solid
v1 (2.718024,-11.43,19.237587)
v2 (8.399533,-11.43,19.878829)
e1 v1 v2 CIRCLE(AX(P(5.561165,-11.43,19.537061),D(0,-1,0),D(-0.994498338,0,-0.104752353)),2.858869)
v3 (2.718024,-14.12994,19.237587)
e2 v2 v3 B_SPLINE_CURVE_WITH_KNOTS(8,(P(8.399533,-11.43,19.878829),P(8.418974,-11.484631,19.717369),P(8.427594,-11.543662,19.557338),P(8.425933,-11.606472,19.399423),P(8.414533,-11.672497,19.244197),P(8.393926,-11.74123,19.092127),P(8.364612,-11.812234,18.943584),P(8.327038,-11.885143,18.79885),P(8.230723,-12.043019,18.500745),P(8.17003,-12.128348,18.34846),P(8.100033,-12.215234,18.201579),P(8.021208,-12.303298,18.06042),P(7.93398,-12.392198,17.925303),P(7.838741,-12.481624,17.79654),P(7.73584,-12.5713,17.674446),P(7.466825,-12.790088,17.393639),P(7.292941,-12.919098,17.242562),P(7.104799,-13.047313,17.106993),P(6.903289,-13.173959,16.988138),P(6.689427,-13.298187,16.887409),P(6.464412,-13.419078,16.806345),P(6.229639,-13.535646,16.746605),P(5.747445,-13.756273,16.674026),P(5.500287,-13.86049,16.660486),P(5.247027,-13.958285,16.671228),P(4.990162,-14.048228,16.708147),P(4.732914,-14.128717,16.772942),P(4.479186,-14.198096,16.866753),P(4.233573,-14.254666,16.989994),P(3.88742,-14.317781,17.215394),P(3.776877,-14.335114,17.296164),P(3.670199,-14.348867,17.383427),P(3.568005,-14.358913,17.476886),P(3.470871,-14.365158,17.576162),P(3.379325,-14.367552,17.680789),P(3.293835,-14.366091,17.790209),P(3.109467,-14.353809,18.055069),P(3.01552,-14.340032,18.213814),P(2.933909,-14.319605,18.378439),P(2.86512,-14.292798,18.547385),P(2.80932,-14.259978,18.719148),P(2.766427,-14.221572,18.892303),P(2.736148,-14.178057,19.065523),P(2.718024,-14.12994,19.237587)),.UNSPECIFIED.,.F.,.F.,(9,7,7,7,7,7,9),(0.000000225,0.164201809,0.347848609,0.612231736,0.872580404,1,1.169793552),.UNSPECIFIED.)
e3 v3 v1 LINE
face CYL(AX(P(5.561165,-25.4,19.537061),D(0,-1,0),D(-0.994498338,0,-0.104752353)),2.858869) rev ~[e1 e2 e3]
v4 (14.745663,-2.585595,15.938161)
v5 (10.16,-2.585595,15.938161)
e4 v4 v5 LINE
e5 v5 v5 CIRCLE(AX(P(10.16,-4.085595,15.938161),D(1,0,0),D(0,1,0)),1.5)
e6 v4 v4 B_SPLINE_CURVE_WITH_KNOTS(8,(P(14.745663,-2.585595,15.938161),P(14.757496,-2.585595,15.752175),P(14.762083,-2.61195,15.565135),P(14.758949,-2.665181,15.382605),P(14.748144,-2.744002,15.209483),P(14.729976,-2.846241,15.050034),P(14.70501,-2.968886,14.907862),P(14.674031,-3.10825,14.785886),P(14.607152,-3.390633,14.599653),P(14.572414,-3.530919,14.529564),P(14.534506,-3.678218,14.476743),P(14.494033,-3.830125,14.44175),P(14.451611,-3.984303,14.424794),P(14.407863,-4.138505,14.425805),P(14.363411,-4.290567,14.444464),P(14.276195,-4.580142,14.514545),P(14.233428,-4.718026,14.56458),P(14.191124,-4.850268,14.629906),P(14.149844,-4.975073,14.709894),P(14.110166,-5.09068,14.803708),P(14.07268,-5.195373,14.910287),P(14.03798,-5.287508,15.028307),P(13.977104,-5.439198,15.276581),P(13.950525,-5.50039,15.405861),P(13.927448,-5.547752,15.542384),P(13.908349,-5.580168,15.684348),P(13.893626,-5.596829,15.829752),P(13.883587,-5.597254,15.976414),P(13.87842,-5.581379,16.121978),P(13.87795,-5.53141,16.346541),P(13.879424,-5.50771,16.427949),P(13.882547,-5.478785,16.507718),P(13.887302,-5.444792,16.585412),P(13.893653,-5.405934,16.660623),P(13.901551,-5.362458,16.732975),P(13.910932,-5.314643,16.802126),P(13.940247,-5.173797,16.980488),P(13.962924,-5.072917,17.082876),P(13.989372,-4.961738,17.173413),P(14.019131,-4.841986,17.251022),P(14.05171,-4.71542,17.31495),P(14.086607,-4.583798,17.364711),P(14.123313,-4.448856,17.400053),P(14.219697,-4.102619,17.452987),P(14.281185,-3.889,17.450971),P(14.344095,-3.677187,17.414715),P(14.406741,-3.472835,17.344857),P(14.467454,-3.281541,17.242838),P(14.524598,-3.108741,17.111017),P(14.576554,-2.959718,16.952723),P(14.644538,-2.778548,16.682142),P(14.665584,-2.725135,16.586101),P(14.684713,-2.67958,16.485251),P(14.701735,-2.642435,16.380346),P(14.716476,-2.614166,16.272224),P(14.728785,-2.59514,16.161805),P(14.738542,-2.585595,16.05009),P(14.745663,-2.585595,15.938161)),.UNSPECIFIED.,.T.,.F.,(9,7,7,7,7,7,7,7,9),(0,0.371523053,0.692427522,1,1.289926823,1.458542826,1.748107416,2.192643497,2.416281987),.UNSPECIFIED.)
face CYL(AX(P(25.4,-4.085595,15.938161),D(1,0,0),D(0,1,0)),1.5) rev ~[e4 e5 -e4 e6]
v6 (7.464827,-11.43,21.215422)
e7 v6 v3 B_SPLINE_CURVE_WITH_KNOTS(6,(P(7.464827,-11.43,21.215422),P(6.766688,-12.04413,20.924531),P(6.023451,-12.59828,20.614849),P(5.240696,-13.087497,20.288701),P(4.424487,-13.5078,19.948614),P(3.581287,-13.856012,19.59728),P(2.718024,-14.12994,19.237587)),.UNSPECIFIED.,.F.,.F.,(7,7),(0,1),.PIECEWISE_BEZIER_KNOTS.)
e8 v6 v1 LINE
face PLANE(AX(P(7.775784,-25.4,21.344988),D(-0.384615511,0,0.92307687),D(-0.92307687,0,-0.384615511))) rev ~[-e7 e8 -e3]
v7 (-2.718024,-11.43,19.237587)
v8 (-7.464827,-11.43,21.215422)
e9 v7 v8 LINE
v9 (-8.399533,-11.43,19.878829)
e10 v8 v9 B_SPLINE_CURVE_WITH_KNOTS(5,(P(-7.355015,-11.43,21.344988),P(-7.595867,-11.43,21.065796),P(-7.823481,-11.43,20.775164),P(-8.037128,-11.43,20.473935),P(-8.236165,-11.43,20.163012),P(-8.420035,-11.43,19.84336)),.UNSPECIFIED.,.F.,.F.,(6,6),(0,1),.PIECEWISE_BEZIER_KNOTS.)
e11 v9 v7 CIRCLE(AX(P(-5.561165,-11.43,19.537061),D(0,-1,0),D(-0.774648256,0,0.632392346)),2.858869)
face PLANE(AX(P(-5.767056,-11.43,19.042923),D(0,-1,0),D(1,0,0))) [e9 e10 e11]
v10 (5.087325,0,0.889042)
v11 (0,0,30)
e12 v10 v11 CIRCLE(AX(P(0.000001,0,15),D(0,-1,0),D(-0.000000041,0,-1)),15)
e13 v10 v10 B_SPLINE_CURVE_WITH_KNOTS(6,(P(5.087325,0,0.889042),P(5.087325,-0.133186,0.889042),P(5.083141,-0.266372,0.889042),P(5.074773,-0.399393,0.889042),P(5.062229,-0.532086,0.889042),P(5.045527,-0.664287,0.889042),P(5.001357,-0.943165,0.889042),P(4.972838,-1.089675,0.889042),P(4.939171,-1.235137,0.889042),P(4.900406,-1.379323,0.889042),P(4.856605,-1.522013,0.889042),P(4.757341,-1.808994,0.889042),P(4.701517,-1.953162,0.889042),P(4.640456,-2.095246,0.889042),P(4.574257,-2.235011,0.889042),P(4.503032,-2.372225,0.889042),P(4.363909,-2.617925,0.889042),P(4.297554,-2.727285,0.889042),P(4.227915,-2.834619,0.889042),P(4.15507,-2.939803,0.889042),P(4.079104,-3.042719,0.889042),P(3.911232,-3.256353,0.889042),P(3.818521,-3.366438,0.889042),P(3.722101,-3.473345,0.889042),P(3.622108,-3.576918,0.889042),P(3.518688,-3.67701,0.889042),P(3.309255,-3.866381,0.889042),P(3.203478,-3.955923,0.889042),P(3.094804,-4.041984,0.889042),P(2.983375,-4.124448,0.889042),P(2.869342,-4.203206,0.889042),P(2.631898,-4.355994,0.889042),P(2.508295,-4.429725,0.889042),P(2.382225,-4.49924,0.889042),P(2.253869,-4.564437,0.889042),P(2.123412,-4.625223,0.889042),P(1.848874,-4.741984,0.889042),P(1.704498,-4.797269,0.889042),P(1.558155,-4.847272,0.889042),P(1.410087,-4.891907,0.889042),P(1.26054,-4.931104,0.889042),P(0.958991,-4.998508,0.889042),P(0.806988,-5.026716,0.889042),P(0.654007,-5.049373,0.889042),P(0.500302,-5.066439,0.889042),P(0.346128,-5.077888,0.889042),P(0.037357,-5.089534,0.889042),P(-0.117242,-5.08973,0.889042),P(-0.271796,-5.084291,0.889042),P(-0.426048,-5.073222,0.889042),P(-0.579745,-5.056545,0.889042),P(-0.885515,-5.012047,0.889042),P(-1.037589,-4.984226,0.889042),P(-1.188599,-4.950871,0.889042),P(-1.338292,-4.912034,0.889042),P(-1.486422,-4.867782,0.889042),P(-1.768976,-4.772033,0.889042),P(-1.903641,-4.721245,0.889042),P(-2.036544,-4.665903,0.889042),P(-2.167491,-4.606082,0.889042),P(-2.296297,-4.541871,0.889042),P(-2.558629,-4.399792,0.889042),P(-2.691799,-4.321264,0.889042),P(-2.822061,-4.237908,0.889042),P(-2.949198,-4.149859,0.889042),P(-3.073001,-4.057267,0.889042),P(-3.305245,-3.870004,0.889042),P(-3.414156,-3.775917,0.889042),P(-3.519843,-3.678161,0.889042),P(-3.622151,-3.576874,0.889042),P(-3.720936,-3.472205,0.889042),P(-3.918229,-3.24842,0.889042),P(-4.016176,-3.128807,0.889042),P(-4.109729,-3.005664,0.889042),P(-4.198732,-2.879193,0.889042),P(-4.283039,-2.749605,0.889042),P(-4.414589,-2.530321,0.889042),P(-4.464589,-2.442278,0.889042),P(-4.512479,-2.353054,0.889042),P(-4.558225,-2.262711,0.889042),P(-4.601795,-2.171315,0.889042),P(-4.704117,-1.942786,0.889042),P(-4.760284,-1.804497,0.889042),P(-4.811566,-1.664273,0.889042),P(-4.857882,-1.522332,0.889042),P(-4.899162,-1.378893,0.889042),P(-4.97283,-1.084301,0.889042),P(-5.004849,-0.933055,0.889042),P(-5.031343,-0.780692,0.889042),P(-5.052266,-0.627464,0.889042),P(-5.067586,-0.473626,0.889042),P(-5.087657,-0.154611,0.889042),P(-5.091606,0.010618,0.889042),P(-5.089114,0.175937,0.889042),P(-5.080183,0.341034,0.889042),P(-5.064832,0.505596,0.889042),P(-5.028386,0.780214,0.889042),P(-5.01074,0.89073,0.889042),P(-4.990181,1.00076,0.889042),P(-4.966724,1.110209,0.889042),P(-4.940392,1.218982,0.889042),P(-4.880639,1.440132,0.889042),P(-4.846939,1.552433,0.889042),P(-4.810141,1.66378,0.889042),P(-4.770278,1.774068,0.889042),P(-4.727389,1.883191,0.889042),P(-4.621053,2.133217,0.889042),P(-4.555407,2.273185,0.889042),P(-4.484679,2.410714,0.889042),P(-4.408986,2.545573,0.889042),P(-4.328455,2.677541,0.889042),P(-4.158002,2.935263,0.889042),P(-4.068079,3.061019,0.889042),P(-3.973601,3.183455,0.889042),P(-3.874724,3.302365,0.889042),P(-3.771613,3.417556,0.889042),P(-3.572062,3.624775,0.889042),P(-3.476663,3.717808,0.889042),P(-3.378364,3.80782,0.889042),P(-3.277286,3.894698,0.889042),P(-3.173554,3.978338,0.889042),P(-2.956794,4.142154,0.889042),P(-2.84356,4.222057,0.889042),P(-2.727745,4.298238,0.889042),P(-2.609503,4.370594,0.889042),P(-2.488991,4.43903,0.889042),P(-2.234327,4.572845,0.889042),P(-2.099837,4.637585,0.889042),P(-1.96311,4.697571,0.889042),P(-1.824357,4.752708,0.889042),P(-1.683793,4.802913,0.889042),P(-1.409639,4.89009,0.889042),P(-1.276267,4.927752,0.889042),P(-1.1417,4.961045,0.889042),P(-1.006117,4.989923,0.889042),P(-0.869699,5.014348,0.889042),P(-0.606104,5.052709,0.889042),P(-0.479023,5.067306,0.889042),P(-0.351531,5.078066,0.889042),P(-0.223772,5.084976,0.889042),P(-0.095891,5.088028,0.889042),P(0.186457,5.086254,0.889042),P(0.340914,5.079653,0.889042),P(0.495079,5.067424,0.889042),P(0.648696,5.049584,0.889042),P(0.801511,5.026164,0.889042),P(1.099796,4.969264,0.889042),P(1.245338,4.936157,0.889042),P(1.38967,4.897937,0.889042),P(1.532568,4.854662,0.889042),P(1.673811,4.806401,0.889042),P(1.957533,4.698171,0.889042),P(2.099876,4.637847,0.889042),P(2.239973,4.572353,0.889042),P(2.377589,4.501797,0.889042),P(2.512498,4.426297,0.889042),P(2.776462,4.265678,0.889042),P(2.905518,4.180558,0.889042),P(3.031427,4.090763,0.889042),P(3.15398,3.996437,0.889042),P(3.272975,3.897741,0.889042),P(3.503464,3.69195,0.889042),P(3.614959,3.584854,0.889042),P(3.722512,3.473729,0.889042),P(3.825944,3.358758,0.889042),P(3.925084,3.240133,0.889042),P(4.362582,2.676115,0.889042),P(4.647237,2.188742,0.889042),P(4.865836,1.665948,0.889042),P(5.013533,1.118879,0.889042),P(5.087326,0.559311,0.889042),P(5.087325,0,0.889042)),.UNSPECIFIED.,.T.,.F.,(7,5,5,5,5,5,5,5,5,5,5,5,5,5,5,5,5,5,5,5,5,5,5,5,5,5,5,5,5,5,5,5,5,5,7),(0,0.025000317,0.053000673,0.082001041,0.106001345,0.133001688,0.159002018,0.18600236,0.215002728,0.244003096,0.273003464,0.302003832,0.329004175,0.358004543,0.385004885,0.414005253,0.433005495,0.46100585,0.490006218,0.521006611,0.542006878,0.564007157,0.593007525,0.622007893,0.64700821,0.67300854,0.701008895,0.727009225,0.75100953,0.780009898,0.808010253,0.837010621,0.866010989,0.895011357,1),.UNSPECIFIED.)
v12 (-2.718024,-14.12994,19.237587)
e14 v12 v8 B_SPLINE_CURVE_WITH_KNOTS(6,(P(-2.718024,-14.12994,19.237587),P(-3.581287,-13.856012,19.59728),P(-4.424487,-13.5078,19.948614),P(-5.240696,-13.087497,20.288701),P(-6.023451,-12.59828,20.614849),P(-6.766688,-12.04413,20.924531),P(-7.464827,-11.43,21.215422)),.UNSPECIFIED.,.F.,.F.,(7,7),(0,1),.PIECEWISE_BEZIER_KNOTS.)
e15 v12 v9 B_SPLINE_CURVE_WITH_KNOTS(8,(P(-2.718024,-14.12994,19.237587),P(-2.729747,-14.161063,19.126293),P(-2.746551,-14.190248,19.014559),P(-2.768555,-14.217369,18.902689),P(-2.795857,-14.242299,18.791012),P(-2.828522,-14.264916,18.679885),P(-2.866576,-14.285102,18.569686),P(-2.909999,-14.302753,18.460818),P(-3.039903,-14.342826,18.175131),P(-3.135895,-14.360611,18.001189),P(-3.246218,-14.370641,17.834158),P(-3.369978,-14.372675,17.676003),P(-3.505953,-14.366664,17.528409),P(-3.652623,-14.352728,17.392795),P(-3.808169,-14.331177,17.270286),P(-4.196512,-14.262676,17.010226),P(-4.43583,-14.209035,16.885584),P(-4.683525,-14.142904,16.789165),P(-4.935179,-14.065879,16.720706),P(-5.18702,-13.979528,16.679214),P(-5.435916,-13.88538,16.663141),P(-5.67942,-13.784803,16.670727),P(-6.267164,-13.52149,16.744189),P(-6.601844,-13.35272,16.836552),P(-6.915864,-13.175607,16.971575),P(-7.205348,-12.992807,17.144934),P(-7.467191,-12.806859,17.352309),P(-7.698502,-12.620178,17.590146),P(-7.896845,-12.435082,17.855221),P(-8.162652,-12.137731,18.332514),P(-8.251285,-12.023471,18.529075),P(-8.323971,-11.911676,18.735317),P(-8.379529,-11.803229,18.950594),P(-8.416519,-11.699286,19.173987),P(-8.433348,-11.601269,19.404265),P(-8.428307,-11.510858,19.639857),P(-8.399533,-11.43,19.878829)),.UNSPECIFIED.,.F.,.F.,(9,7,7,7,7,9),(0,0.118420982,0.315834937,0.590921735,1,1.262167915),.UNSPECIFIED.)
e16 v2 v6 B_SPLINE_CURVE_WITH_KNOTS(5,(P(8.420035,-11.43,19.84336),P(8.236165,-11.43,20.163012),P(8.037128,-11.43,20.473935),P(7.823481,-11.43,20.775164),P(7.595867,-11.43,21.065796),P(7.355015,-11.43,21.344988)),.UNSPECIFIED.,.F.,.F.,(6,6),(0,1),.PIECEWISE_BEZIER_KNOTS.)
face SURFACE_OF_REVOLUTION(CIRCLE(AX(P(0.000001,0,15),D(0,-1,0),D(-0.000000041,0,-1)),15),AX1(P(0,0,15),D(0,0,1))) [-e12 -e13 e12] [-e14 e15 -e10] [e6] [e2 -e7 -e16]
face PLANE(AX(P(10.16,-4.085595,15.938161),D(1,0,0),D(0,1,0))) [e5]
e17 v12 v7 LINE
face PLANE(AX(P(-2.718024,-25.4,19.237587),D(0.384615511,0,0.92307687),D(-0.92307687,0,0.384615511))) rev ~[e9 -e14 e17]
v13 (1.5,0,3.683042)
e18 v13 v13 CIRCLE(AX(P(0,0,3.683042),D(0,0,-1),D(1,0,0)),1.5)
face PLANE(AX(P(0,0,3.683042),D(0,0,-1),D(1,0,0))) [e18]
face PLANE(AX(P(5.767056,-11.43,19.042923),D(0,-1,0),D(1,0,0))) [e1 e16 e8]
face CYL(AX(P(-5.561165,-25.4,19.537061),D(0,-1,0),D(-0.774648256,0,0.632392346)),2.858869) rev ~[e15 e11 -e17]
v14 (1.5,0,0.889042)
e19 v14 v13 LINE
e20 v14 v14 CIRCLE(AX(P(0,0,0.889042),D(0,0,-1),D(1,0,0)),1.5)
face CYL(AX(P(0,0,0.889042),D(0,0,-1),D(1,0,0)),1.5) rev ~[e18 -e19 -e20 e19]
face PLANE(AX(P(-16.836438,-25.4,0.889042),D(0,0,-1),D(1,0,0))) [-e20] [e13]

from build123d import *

# Parameters (mm, degrees)
F5_DEPTH  = 13.97
F6_R      = 1.5
F7_DEPTH  = 15.24
F8_W      = 36.1250601709
F8_H      = 9.7824148252
F9_DEPTH  = 76.2
F10_R     = 1.5
F11_DEPTH = 2.794


# Not quite as in the source:
# - ends of sketch curves that miss each other by under 0.0002 mm in the source are joined


with BuildPart() as f1:
    # F0 (on Front) → F1 (revolve)
    with BuildSketch(Plane.XZ):
        with BuildLine():
            Line((0, 30), (0, 0))
            ThreePointArc((0, 0), (15.0000006192, 15), (0, 30))
        make_face()
    revolve(axis=Axis((0, 0, 15), (0, 0, 1)))

    # F4 (on offset) → F5 (cut)
    with BuildSketch(Plane.XZ.offset(25.4)):
        with BuildLine():
            ThreePointArc((-7.7757835388, 21.3449876755), (-6.6607308484, 16.8981042804), (-2.7180244215, 19.2375872284))
            Line((-2.7180244215, 19.2375872284), (-7.7757835388, 21.3449876755))
        make_face()
        with BuildLine():
            Line((7.7757835388, 21.3449876755), (2.7180244215, 19.2375872284))
            ThreePointArc((2.7180244215, 19.2375872284), (6.6607308484, 16.8981042804), (7.7757835388, 21.3449876755))
        make_face()
    extrude(amount=-F5_DEPTH, mode=Mode.SUBTRACT)

    # F6 (on offset) → F7 (cut)
    with BuildSketch(Plane.YZ.offset(25.4)):
        with Locations((-4.0855947882, 15.938160941)):
            Circle(F6_R)
    extrude(amount=-F7_DEPTH, mode=Mode.SUBTRACT)

    # F8 (on offset) → F9 (cut)
    with BuildSketch(Plane.XZ.offset(25.4)):
        with Locations((1.2260917574, -4.0021650784)):
            Rectangle(F8_W, F8_H)
    extrude(amount=-F9_DEPTH, mode=Mode.SUBTRACT)

    # F10 (on face) → F11 (cut)
    with BuildSketch(Plane(origin=(0, 0, 0.8890423342), x_dir=(1, 0, 0), z_dir=(0, 0, -1))):
        Circle(F10_R)
    extrude(amount=-F11_DEPTH, mode=Mode.SUBTRACT)


solid = f1.part
